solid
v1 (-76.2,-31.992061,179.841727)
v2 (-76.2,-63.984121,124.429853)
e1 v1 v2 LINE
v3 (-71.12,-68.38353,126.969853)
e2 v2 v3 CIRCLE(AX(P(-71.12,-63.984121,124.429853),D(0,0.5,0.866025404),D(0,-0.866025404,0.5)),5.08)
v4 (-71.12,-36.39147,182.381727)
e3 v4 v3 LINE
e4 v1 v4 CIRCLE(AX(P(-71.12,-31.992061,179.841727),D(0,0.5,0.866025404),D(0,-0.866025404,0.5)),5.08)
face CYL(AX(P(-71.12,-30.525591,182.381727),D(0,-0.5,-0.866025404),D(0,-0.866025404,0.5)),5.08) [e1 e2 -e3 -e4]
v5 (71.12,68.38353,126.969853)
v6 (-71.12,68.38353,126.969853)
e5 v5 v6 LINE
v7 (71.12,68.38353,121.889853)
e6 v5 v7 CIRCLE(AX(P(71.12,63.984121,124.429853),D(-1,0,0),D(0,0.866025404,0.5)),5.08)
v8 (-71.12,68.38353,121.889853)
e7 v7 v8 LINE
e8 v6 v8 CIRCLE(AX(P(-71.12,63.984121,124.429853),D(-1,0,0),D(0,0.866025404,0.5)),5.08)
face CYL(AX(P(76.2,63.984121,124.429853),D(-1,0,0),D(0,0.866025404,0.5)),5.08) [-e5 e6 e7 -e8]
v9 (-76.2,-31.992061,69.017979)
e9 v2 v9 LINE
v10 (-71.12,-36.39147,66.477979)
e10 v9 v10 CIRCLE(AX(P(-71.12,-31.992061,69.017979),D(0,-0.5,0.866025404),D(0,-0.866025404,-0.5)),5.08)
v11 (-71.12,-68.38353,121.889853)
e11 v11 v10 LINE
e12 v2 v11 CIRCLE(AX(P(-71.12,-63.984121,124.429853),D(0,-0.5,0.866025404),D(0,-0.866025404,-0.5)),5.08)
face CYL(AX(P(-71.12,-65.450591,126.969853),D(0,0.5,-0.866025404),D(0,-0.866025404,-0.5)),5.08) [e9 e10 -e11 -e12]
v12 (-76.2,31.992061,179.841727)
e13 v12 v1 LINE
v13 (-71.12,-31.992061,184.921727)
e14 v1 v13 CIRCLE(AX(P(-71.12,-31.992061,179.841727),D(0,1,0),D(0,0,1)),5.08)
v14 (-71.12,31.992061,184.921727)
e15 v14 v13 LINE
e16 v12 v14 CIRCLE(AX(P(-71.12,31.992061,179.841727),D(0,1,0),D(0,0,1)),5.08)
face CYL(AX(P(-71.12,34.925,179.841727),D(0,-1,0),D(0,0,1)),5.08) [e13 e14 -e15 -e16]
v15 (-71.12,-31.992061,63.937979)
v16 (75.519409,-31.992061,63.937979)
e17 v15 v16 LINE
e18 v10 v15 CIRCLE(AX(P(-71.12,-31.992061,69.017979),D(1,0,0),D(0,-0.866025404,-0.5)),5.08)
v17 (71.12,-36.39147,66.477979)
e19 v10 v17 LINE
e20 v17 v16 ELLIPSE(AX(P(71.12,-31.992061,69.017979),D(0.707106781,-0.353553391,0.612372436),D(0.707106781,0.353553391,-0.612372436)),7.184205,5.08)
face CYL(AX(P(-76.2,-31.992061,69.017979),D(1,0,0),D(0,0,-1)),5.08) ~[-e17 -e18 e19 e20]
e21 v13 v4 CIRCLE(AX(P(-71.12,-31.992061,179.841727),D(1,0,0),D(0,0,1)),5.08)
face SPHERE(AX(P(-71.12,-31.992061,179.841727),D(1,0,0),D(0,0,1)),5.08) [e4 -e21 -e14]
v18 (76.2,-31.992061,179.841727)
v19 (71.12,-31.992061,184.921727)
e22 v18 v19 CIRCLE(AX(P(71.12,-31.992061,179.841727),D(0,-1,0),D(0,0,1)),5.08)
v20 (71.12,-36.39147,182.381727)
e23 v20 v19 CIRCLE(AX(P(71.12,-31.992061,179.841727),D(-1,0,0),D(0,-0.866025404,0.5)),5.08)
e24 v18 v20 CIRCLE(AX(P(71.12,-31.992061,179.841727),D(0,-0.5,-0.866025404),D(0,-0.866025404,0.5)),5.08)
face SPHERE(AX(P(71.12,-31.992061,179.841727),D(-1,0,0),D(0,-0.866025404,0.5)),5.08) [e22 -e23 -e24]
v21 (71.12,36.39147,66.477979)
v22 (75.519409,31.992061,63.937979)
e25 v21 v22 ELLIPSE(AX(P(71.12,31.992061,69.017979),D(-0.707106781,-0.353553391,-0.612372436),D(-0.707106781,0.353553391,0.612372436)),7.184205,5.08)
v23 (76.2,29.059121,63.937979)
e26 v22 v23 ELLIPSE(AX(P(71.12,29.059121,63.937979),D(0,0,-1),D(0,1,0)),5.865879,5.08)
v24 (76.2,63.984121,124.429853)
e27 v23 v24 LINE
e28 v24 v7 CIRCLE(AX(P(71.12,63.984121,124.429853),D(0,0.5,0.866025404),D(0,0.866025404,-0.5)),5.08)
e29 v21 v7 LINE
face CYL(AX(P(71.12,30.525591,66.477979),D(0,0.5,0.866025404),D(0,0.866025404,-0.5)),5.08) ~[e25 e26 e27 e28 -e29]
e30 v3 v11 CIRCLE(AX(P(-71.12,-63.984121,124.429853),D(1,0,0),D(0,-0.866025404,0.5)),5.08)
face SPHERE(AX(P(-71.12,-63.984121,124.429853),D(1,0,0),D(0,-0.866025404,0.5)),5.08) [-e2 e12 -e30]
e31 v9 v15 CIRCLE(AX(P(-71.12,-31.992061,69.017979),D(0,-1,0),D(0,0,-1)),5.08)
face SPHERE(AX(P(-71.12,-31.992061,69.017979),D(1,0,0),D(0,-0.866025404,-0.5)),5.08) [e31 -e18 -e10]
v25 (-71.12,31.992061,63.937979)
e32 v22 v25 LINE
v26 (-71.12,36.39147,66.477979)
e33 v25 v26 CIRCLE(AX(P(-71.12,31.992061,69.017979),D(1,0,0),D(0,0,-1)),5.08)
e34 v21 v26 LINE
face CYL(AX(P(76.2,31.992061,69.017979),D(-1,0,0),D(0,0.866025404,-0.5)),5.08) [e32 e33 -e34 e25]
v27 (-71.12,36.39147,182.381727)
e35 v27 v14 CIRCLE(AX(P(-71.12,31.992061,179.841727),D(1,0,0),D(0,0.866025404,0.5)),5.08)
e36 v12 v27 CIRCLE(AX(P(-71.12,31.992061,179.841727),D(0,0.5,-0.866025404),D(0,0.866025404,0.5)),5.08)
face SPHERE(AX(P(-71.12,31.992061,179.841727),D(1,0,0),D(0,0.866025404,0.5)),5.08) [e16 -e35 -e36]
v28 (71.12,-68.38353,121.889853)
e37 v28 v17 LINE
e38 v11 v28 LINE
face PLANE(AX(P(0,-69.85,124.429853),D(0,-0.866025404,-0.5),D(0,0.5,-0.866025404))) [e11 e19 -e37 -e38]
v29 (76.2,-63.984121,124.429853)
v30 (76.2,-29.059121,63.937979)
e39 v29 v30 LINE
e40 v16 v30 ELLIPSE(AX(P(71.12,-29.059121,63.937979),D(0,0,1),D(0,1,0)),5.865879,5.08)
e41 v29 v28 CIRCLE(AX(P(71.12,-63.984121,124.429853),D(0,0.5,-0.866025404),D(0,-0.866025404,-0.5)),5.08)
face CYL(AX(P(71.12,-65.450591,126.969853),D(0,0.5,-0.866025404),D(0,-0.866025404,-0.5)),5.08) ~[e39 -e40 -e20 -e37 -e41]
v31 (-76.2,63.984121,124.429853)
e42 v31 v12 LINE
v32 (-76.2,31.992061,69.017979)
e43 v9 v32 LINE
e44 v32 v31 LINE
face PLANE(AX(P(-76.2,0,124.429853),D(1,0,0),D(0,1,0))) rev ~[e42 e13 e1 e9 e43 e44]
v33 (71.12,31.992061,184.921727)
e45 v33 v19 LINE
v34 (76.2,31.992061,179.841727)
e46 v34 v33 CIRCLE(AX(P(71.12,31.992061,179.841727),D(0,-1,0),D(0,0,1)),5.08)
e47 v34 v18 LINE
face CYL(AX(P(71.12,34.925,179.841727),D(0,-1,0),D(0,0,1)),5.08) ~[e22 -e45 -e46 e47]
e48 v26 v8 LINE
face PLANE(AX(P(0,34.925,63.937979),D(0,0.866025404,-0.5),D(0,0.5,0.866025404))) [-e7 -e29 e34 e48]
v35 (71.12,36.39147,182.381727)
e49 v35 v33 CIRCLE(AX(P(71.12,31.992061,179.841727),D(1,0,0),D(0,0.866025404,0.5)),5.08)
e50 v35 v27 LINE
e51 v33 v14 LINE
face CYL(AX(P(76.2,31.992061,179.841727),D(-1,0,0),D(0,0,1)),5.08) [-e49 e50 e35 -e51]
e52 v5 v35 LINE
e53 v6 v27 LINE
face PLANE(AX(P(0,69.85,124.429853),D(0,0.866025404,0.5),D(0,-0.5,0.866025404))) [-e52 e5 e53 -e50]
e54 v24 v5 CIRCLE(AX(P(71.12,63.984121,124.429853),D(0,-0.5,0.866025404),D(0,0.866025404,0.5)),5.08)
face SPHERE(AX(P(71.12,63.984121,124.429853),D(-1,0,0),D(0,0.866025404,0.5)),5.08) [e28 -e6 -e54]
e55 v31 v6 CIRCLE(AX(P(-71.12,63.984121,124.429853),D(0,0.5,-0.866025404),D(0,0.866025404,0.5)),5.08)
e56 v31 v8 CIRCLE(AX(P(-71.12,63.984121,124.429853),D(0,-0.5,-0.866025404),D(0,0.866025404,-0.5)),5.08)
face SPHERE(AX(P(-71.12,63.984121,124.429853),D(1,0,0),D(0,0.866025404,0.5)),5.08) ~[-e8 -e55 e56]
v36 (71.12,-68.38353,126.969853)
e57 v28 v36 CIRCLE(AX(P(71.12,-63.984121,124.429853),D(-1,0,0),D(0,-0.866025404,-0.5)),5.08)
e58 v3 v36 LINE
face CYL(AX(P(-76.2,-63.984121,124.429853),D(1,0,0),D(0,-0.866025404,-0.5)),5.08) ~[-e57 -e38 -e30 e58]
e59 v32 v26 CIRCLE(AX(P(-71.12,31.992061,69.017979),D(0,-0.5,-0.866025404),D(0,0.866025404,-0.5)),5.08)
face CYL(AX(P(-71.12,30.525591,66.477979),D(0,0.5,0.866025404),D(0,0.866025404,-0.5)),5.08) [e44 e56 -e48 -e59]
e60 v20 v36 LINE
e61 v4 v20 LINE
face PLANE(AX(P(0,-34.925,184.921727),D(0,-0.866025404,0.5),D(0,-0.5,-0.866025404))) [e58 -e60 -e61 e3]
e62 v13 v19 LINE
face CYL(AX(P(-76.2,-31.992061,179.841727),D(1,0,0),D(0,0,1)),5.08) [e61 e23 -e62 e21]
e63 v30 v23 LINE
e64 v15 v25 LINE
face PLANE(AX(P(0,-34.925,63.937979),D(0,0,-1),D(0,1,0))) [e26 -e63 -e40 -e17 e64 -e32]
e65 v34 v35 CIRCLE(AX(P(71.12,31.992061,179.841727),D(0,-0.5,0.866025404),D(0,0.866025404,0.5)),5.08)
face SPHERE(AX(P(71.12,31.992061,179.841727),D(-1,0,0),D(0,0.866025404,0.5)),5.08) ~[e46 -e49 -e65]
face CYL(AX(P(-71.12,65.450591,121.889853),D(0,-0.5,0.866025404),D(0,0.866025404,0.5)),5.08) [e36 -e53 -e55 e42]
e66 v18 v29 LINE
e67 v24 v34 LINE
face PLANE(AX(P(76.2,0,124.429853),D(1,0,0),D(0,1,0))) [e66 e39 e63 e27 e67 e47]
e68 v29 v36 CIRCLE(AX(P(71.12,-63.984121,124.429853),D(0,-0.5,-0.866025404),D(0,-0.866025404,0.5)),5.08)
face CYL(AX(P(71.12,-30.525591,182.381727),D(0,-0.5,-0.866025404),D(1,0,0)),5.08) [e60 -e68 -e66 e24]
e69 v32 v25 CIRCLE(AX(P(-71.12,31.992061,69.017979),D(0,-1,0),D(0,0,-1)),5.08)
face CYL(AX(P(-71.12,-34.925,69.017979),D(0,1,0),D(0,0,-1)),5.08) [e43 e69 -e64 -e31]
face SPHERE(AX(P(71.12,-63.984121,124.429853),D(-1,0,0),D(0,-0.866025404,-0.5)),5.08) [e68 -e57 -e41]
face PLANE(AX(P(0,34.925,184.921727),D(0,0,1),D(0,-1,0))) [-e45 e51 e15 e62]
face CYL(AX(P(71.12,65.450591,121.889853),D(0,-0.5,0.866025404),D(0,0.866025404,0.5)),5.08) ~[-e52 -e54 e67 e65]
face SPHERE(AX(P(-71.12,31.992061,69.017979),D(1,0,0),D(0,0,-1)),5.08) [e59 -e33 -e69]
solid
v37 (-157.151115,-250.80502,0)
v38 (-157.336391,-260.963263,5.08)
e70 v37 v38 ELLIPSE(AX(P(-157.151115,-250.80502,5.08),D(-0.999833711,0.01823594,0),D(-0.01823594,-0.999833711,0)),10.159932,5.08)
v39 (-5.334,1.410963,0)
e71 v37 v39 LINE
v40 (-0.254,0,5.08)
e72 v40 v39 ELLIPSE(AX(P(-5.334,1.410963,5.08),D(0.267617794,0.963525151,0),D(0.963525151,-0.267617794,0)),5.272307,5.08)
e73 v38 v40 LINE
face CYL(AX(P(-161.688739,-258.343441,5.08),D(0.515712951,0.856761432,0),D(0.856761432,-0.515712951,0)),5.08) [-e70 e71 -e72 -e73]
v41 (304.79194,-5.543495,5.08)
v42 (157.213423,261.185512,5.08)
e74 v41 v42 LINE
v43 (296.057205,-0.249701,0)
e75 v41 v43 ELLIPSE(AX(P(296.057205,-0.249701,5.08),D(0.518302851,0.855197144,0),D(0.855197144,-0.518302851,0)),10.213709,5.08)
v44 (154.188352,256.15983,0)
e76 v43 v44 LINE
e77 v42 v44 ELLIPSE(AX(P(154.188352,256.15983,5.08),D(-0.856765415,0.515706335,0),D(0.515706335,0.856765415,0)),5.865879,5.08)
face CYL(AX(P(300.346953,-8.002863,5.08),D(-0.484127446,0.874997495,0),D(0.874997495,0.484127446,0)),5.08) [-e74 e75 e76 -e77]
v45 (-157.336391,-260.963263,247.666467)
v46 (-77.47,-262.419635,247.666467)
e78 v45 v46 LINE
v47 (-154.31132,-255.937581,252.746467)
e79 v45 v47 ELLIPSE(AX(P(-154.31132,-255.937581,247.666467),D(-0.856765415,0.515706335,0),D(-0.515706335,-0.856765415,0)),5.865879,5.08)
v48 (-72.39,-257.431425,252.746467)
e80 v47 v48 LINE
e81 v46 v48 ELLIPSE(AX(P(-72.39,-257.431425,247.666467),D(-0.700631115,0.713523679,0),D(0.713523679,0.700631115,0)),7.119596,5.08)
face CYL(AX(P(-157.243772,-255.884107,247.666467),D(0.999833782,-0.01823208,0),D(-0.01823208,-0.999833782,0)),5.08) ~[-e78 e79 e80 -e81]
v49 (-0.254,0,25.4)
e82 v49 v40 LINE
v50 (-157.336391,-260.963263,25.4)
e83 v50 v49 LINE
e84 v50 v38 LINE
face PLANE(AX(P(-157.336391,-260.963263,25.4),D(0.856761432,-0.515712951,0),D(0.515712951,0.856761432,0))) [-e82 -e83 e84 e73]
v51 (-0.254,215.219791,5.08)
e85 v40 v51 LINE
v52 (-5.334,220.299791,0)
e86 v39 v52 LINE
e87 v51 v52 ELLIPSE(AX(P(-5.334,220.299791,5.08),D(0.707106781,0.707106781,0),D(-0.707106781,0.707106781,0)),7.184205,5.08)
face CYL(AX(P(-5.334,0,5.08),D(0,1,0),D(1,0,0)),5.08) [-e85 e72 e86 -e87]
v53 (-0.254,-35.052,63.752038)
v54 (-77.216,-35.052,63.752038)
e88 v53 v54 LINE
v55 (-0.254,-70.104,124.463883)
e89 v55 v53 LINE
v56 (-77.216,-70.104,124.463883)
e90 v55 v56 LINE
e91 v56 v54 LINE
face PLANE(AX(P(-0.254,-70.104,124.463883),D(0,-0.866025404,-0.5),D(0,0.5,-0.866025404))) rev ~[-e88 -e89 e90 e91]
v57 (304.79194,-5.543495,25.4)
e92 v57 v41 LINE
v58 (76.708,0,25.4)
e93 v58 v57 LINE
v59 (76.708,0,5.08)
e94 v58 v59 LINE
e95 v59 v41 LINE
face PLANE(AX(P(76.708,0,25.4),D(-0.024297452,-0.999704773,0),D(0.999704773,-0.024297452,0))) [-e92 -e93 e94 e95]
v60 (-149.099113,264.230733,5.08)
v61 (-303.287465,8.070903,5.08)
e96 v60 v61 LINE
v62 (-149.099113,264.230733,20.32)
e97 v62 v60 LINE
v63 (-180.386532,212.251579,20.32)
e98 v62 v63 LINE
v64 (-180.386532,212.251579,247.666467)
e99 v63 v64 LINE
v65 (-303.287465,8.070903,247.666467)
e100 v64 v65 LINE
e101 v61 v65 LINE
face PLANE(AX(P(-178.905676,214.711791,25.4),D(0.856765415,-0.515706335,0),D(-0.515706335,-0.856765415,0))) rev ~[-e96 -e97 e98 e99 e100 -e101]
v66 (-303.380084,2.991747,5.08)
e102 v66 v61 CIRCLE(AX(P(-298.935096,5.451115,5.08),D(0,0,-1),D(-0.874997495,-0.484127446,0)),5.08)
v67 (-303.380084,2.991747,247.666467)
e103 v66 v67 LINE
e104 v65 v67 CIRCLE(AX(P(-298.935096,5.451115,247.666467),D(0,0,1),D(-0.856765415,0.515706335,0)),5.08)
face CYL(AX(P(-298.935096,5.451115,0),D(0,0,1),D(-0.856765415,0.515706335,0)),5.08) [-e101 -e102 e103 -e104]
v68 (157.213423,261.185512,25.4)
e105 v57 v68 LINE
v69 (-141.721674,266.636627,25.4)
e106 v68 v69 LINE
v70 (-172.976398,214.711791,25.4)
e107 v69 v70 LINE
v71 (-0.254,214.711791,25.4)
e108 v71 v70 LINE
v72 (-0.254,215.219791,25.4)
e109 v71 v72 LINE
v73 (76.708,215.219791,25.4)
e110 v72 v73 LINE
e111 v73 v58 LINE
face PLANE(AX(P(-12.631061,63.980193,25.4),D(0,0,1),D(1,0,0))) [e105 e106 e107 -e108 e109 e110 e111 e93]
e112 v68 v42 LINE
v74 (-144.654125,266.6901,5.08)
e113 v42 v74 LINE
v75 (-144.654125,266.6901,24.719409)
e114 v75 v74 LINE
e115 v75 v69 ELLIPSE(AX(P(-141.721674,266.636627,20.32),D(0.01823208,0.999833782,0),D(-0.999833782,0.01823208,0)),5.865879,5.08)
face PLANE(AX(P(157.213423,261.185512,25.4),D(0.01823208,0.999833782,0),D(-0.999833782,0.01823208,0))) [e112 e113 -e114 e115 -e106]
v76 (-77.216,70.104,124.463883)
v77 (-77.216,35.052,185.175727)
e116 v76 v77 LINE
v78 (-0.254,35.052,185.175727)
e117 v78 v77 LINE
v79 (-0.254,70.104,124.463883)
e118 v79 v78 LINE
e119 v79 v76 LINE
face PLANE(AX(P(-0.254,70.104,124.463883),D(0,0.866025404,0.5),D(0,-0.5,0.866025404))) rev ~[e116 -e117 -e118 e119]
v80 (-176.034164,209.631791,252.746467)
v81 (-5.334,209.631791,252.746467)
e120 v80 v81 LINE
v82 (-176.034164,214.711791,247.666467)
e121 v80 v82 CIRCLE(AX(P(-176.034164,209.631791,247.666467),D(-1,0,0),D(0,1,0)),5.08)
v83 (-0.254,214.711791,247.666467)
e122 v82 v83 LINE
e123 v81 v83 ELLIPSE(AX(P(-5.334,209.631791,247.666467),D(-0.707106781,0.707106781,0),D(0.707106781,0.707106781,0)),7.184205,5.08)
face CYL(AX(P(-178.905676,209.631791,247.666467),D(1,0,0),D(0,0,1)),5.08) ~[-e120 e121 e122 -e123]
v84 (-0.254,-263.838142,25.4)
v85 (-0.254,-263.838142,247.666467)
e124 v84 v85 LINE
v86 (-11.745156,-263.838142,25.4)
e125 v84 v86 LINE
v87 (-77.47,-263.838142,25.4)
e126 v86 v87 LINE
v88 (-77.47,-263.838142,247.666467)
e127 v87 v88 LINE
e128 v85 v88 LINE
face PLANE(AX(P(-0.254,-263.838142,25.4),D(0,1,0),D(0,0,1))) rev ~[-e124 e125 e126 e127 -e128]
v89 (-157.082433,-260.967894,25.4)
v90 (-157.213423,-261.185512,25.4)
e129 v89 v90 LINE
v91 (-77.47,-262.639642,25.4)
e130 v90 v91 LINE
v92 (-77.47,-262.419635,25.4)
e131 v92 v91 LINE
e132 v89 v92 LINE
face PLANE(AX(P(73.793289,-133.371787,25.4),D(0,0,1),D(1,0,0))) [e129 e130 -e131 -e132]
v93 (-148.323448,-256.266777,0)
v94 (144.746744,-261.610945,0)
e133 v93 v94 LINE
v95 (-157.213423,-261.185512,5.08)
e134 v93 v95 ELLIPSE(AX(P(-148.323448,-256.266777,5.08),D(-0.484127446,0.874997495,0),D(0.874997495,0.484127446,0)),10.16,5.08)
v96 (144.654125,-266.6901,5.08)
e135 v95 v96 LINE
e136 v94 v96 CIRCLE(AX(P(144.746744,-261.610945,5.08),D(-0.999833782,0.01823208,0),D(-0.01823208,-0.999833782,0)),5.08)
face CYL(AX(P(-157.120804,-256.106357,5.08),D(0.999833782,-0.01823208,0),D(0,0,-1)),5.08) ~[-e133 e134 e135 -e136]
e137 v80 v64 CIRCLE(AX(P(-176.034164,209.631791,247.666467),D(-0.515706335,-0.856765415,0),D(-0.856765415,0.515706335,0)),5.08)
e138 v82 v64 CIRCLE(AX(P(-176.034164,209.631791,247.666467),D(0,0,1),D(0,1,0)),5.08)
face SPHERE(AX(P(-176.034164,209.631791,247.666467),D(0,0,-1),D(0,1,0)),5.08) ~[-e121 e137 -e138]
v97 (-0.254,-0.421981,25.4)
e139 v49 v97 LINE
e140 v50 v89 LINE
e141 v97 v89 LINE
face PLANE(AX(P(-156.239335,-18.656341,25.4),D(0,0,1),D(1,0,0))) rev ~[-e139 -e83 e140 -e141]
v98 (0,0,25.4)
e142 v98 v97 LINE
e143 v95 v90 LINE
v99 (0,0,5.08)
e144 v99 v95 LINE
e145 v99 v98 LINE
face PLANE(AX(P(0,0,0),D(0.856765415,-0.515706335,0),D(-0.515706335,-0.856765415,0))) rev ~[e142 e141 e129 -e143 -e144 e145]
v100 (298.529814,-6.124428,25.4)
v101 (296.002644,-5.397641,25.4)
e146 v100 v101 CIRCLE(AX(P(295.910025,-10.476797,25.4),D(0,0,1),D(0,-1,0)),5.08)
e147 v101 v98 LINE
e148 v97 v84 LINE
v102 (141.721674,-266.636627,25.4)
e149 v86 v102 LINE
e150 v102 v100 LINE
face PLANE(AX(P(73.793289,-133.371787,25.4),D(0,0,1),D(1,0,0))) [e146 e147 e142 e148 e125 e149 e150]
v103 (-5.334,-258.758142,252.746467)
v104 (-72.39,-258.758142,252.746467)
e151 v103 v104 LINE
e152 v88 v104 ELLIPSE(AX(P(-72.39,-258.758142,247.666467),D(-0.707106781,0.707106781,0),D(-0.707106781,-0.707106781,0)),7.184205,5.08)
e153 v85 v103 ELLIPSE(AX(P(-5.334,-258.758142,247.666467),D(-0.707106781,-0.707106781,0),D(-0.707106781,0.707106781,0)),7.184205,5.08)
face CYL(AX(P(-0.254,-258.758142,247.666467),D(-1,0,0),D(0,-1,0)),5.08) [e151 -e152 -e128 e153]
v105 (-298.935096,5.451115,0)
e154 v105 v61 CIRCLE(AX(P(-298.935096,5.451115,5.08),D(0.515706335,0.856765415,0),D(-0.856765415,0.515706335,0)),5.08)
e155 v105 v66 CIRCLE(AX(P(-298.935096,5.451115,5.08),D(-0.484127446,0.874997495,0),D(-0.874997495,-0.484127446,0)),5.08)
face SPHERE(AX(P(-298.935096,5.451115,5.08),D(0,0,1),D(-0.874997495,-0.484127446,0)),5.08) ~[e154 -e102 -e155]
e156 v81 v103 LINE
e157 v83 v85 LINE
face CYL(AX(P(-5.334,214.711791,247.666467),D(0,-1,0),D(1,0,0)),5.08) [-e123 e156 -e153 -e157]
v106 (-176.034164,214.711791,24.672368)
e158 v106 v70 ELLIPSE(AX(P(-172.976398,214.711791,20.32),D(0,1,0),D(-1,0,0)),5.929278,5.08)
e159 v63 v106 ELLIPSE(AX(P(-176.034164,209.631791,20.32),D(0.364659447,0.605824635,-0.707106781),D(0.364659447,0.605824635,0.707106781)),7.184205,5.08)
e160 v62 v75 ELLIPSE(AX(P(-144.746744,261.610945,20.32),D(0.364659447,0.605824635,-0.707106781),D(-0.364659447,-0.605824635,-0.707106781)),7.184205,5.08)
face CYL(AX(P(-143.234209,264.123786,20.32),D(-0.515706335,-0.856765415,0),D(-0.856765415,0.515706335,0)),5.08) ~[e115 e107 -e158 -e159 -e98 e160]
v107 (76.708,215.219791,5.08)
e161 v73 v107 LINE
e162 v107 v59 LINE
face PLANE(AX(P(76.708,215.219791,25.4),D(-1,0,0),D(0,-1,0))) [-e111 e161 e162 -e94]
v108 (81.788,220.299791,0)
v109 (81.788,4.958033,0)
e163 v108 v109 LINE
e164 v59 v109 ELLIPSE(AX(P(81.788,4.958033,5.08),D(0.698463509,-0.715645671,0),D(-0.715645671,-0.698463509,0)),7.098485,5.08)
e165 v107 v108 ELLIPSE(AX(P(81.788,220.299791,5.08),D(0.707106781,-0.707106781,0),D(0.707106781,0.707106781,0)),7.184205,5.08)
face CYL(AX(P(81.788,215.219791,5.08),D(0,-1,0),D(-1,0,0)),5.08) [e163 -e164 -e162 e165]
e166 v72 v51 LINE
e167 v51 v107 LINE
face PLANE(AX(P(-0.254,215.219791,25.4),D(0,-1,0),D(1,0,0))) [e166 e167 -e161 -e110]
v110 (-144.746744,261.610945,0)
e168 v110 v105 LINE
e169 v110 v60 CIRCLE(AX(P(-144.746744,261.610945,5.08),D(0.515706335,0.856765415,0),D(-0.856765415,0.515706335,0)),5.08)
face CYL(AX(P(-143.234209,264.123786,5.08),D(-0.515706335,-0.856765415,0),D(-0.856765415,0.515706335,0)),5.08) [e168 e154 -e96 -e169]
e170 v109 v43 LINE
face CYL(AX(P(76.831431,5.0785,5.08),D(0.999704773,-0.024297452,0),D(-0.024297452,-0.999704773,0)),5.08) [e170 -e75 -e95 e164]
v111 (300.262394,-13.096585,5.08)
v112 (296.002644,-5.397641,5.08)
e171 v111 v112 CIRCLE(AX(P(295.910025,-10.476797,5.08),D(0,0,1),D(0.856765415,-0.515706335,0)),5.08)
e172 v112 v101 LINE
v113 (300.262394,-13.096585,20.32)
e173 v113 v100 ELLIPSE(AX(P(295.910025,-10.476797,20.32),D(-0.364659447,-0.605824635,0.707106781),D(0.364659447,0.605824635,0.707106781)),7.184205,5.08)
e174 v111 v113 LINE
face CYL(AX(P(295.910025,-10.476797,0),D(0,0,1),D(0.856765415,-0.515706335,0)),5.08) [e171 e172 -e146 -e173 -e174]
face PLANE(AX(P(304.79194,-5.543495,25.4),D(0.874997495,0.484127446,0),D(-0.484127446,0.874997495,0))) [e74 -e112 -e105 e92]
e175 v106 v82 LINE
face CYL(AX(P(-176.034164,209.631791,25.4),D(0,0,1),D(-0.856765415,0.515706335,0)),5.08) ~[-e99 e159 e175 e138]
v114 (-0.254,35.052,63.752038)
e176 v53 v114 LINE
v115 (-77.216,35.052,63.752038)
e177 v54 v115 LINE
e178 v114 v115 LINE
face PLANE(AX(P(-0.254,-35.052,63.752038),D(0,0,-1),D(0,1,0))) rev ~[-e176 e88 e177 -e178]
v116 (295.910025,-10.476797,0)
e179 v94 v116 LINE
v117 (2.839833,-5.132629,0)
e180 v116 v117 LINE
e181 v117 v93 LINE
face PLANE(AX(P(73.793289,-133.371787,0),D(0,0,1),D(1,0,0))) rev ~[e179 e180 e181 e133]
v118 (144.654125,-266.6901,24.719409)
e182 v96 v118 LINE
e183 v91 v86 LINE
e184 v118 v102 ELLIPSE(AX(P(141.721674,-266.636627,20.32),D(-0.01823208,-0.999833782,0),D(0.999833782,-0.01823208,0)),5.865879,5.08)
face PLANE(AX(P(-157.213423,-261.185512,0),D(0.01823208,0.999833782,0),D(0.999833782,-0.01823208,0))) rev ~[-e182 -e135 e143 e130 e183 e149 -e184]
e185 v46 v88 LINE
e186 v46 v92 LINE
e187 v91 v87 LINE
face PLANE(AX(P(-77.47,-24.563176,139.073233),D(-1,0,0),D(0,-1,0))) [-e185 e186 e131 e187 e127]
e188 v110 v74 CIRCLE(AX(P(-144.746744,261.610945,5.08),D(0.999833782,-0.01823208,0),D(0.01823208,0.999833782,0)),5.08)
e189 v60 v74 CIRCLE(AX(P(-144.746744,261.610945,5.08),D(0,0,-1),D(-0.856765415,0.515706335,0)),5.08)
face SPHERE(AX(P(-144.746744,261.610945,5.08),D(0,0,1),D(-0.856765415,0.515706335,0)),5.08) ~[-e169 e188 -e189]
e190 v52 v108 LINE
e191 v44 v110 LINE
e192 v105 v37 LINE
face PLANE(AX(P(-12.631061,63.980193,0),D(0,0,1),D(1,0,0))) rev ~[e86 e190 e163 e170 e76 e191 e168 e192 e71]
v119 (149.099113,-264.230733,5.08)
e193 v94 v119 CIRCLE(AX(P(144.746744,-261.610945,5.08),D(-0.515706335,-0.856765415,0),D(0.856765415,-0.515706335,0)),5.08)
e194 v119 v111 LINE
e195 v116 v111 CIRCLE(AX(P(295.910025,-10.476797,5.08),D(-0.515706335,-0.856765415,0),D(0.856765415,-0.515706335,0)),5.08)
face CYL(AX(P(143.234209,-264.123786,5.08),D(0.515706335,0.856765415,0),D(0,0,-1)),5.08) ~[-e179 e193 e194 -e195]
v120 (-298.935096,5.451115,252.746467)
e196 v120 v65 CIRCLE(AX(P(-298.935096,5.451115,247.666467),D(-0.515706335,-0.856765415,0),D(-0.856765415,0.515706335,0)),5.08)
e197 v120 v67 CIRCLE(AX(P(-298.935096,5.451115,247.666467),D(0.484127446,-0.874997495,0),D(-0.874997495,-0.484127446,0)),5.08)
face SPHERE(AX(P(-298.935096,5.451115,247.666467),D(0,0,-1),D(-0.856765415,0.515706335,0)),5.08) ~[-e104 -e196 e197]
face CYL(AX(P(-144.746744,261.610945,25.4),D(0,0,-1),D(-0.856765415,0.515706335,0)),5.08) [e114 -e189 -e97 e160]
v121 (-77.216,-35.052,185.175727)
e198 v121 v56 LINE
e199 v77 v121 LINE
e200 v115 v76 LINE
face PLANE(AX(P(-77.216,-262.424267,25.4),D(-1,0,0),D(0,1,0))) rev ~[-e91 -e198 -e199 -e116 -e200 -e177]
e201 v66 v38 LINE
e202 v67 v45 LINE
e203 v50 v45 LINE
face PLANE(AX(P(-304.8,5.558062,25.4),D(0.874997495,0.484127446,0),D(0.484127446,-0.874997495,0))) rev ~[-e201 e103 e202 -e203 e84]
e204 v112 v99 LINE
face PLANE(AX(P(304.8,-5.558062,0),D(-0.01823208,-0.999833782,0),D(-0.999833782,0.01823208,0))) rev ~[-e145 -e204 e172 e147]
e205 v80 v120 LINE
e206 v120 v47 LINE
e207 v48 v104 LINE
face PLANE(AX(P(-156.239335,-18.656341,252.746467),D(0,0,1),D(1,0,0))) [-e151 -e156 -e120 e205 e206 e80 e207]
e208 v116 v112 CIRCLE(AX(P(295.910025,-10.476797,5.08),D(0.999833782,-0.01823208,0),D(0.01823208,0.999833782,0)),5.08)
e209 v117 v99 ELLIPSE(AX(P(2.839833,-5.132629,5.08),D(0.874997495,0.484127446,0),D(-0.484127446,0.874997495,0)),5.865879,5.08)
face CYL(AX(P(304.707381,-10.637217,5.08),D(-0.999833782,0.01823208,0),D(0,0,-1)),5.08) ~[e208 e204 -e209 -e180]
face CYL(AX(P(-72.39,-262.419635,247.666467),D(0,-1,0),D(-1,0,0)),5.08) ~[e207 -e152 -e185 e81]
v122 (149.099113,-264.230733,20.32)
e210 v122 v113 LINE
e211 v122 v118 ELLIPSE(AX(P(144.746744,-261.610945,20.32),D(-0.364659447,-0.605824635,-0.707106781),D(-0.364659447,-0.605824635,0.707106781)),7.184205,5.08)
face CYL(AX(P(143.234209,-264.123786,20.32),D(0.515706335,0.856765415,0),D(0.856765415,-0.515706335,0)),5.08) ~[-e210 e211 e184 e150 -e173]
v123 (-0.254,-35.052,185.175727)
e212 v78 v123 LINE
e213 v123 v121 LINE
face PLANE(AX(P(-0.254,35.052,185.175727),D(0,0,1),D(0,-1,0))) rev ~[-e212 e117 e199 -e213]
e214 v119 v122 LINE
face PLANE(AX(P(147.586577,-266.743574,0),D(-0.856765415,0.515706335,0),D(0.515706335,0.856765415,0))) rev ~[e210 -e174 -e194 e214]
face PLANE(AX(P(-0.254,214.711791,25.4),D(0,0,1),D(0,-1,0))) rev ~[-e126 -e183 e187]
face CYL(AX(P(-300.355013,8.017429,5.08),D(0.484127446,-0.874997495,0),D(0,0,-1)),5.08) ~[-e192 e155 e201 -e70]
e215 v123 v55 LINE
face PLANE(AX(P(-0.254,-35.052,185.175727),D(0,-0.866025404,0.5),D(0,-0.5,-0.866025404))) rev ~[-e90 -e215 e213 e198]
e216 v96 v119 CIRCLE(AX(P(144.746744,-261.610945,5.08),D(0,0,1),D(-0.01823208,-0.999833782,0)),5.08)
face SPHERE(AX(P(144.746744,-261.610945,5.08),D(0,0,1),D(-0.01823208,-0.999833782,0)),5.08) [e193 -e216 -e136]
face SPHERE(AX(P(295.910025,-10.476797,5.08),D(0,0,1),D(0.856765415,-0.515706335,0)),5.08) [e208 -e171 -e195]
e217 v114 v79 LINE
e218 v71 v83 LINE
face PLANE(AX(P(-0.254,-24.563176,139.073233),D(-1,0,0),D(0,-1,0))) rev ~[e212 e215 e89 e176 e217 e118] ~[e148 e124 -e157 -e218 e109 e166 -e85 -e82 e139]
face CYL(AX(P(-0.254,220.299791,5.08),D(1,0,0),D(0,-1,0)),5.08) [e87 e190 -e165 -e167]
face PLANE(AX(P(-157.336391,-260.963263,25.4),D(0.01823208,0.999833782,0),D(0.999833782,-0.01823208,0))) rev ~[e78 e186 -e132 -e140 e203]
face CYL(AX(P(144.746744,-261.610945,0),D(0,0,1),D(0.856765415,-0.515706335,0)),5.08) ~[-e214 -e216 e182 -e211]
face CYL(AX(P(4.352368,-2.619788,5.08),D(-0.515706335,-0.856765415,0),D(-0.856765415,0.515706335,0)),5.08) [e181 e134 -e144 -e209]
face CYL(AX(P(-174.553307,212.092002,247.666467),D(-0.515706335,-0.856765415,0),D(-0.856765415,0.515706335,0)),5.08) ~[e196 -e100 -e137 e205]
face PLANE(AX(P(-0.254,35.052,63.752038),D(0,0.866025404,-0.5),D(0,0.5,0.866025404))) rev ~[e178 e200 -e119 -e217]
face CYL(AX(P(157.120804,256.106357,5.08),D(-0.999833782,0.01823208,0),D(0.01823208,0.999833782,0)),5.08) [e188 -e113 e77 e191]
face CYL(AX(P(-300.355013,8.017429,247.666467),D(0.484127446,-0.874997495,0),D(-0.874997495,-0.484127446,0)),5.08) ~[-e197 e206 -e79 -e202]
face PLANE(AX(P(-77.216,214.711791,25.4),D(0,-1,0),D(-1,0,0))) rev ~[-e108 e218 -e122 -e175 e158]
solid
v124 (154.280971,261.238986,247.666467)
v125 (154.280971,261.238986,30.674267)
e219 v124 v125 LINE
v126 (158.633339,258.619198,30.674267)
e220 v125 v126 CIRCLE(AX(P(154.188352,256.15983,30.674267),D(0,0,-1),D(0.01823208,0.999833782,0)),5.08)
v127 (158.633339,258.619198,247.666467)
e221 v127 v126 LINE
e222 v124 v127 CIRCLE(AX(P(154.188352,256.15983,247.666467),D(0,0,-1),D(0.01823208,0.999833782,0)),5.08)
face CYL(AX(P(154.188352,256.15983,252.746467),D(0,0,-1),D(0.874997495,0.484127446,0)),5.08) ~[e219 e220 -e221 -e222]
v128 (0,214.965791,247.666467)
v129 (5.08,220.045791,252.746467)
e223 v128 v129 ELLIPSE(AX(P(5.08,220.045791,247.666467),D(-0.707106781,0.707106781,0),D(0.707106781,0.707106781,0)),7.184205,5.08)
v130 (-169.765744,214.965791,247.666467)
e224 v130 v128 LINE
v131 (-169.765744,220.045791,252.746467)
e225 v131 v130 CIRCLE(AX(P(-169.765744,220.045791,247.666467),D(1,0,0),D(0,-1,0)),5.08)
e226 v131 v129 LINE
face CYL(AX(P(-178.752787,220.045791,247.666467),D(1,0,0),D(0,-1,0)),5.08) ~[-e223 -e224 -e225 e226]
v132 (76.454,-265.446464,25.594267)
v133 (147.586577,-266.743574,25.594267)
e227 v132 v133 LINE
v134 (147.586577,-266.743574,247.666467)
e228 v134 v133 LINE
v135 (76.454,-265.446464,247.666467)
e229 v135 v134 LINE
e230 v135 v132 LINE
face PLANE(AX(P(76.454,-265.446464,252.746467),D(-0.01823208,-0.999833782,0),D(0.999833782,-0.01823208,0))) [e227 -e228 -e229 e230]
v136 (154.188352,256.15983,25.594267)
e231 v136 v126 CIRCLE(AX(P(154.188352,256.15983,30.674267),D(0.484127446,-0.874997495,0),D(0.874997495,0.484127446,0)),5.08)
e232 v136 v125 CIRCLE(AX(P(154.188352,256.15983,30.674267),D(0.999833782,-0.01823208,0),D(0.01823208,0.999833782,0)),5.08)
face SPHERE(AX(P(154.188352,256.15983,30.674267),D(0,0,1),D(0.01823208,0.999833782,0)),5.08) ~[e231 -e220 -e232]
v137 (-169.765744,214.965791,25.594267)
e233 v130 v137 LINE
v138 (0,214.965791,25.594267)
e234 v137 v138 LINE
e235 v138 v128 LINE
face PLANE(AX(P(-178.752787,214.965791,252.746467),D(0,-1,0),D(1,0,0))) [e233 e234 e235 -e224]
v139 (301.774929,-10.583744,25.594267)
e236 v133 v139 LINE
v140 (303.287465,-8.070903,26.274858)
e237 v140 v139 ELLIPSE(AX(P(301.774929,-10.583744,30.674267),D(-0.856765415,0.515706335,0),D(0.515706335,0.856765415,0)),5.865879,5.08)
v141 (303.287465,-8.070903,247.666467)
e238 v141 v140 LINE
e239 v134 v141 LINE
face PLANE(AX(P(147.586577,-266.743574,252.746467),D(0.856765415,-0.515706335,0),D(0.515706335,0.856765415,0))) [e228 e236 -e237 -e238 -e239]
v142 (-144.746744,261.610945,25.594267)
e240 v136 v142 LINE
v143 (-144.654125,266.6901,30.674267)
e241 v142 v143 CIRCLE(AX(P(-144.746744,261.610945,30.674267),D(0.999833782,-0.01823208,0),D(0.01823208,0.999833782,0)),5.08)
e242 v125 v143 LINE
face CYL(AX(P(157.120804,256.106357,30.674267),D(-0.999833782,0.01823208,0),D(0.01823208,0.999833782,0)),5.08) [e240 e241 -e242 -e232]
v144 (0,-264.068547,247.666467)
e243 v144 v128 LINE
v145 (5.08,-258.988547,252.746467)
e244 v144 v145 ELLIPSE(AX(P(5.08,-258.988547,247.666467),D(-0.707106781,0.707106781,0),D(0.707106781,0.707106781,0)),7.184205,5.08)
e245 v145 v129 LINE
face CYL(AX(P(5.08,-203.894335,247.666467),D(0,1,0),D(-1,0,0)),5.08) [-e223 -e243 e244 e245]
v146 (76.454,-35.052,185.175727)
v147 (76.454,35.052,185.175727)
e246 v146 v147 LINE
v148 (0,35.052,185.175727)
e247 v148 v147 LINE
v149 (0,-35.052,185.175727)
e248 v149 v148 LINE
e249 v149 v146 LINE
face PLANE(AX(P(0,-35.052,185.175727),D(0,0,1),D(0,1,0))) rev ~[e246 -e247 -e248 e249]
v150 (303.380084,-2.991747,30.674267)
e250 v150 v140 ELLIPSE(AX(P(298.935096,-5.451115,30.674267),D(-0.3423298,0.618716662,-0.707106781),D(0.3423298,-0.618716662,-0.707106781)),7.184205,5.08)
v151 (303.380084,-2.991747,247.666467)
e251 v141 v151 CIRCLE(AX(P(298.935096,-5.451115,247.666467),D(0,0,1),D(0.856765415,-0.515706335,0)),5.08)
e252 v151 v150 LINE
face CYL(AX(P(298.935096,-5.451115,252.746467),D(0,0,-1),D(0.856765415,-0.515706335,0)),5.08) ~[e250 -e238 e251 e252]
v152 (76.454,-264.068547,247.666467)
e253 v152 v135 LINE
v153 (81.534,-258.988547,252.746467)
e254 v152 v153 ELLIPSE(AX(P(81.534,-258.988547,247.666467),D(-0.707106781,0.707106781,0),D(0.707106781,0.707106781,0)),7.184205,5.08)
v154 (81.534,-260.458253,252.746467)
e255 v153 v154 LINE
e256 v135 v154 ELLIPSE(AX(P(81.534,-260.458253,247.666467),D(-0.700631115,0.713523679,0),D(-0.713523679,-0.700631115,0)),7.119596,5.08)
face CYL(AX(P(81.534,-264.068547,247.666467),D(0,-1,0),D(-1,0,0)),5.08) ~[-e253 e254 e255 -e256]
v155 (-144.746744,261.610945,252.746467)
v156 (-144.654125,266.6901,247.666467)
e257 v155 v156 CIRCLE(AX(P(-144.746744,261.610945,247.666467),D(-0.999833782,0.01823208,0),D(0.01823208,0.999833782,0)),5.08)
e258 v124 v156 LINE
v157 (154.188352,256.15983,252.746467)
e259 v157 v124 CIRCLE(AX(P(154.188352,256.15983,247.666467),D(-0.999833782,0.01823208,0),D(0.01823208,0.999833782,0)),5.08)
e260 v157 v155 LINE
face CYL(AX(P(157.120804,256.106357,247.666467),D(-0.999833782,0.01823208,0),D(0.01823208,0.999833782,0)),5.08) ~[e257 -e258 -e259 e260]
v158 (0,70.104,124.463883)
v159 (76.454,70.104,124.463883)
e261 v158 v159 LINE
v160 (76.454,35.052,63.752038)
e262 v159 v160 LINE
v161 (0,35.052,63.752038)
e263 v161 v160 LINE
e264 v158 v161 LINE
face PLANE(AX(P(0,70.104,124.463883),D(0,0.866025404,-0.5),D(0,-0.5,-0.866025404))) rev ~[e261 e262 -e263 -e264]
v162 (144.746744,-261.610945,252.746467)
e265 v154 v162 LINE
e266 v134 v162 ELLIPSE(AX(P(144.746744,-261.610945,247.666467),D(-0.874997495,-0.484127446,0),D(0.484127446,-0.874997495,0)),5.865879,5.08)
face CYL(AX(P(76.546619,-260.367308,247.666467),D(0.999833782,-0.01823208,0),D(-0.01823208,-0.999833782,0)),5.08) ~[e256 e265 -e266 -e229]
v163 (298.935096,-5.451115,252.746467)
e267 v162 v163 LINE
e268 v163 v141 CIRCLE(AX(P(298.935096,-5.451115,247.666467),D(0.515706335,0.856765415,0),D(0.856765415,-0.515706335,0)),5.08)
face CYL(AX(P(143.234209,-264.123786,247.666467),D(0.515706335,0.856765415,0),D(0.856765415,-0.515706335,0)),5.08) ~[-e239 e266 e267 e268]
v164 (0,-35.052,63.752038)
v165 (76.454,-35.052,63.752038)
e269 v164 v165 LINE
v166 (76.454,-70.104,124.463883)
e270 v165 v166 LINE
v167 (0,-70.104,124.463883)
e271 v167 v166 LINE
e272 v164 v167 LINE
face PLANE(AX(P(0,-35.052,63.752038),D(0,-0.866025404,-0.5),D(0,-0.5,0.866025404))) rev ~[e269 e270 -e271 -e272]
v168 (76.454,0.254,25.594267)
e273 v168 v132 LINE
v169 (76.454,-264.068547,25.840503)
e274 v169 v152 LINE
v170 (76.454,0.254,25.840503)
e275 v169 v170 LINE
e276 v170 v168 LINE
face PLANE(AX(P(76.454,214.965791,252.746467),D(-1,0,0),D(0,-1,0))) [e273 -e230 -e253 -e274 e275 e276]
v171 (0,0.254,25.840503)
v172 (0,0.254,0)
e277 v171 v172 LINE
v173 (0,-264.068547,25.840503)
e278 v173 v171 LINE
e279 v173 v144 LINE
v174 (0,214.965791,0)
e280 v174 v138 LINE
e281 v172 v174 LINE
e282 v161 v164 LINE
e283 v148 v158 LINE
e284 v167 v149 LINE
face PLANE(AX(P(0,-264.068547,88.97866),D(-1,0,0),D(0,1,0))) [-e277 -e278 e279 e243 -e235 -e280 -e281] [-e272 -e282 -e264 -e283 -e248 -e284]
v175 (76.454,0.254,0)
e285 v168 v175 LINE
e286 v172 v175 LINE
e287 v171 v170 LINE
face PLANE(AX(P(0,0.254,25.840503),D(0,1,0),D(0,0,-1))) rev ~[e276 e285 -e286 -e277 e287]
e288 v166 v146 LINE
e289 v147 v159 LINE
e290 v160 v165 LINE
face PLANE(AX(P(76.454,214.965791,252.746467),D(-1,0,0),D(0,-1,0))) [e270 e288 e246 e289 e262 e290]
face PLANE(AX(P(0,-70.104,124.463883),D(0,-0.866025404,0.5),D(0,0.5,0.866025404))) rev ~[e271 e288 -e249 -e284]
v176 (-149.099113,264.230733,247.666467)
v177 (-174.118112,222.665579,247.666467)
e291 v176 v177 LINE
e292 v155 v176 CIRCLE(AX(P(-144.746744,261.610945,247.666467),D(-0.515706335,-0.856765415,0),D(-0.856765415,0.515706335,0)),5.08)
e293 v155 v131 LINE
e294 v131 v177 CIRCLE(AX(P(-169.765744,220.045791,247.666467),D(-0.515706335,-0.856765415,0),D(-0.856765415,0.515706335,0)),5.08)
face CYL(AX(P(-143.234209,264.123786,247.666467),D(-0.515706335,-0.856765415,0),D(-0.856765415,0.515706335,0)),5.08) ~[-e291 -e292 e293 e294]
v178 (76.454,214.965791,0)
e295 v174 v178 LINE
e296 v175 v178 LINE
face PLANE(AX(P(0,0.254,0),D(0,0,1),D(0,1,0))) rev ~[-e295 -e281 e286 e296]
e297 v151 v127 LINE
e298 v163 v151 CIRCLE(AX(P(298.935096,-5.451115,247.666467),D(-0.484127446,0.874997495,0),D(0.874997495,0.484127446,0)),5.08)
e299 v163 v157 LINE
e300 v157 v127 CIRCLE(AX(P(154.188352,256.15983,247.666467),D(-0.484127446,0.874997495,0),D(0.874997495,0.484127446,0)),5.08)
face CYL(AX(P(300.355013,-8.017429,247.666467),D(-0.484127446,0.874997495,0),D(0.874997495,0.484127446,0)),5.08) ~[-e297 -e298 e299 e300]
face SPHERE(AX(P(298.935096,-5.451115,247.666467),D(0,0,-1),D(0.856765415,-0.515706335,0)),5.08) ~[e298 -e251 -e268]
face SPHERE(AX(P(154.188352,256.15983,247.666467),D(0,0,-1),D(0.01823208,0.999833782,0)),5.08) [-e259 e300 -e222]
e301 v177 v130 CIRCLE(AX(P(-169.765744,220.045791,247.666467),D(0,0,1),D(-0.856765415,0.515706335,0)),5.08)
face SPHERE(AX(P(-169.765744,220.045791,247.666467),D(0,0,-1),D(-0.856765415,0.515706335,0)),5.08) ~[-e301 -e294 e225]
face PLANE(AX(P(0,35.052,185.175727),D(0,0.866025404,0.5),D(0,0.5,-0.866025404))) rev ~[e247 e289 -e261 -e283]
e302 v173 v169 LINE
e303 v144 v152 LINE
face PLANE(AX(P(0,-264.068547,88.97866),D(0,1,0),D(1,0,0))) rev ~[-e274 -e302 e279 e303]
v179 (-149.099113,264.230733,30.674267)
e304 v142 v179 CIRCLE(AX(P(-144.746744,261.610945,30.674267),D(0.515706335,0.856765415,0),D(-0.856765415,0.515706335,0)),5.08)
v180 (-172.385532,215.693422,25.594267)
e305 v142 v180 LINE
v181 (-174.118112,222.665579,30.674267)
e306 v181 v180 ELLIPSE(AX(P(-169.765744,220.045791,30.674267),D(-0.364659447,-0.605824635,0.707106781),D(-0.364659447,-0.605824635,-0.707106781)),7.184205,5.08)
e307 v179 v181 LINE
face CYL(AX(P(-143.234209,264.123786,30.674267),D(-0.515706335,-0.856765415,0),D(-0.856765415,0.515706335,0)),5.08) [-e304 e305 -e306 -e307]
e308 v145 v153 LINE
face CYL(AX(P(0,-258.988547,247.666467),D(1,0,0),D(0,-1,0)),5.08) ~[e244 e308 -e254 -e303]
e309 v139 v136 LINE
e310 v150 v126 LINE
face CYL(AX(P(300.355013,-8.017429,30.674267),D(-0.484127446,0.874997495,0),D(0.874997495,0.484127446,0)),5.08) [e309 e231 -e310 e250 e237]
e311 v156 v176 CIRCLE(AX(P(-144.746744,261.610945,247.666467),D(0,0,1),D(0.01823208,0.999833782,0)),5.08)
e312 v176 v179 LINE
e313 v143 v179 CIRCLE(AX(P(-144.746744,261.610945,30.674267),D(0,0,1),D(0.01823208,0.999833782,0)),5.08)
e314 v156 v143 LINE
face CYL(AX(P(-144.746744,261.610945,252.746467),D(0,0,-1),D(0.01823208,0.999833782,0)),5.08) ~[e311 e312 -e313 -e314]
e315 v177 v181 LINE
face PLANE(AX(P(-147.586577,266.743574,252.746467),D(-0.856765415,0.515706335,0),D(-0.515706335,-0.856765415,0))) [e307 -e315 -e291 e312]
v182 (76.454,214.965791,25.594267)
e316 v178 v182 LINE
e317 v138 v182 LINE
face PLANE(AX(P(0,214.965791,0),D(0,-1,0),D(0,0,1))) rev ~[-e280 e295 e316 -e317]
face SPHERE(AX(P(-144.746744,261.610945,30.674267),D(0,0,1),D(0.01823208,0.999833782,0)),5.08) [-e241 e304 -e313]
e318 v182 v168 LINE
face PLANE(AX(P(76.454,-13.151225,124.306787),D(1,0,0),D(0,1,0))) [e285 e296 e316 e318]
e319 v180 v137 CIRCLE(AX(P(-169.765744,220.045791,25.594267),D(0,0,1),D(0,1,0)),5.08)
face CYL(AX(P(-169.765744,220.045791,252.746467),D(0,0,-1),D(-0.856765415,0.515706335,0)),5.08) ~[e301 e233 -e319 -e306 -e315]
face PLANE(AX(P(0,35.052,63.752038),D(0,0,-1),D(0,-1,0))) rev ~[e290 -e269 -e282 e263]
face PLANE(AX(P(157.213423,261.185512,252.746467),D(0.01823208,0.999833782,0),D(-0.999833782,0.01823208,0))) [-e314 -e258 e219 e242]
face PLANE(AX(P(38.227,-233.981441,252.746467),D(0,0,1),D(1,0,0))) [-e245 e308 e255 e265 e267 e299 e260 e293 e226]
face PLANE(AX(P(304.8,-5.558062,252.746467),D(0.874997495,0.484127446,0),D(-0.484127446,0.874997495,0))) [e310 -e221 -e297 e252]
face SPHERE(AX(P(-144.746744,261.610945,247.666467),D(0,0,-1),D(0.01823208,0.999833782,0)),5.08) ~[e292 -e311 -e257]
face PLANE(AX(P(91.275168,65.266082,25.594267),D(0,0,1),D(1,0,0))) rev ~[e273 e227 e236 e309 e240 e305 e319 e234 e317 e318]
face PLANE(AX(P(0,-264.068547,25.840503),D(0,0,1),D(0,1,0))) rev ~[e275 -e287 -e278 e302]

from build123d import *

# Parameters (mm, degrees)
F2_DEPTH      = 25.4
F4_DEPTH      = 76.2
F4_DEPTH_BACK = 76.2
F6_DEPTH      = 76.454
F8_DEPTH      = 227.1522
F10_DEPTH     = 25.4
F12_W         = 478.5499326668
F12_H         = 227.3464668878
F13_DEPTH     = 77.216
F15_DEPTH     = 227.3464668878
F16_W         = 76.454
F16_H         = 60.1742118597
F17_DEPTH     = 163.7678072
F18_R         = 5.08
F18_2_R       = 5.08
F20_R         = 5.08


# Not quite as in the source:
# - an extrude ends at something that could not be found from the text; its depth is read off the source's solid


with BuildPart() as f2:
    # F1 (on face) → F2 (new body)
    with BuildSketch(Plane.XY):
        Polygon((304.8, -5.5580618585), (0, 0), (-157.2134227653, -261.1855121443), (147.5865772347, -266.7435740027), align=None)
    extrude(amount=F2_DEPTH)



with BuildPart() as f4:
    # F3 (on Right) → F4 (new body, two sides)
    with BuildSketch(Plane.YZ) as f4_sk:
        Polygon((34.925, 184.9217274444), (-34.925, 184.9217274444), (-69.85, 124.4298529901), (-34.925, 63.9379785357), (34.925, 63.9379785357), (69.85, 124.4298529901), align=None)
    extrude(amount=F4_DEPTH)
    extrude(f4_sk.sketch, amount=-F4_DEPTH_BACK)

    # F20
    f20_edges = [f4.edges().sort_by_distance(p)[0] for p in [
        (76.2, 0, 184.921727),
        (0, -34.925, 184.921727),
        (-76.2, 0, 184.921727),
        (0, 34.925, 184.921727),
        (-76.2, 52.3875, 154.67579),
        (-76.2, -52.3875, 154.67579),
        (-76.2, -52.3875, 94.183916),
        (-76.2, 0, 63.937979),
        (-76.2, 52.3875, 94.183916),
        (76.2, -52.3875, 154.67579),
        (0, -69.85, 124.429853),
        (0, 69.85, 124.429853),
        (76.2, 52.3875, 154.67579),
        (76.2, -52.3875, 94.183916),
        (0, -34.925, 63.937979),
        (0, 34.925, 63.937979),
        (76.2, 52.3875, 94.183916),
    ]]
    fillet(f20_edges, radius=F20_R)


with BuildPart() as f6:
    # F5 (on Right) → F6 (new body)
    with BuildSketch(Plane.YZ):
        Polygon((-264.0685473475, 88.9786597022), (-264.0685473475, 25.8405029335), (0.254, 25.8405029335), (0.254, 0), (214.9657905102, 0), (214.9657905102, 252.7464668878), (-203.8943354878, 252.7464668878), (-203.8943354878, 88.9786597022), align=None)
        Polygon((-35.052, 185.1757274444), (35.052, 185.1757274444), (70.104, 124.4638825375), (35.052, 63.7520376306), (-35.052, 63.7520376306), (-70.104, 124.4638825375), align=None, mode=Mode.SUBTRACT)
    extrude(amount=F6_DEPTH)

    # F7 (on face) → F8 (join)
    with BuildSketch(Plane.XY.offset(252.7464668878)):
        Polygon((-178.7527874094, 214.9657905102), (0, 214.9657905102), (76.454, 214.9657905102), (76.454, -203.8943354878), (76.454, -265.4464635552), (147.5865772347, -266.7435740027), (304.8, -5.5580618585), (157.2134227653, 261.1855121443), (-147.5865772347, 266.7435740027), align=None)
    extrude(amount=-F8_DEPTH)

    # F16 (on face) → F17 (join, through all)
    with BuildSketch(Plane.XY.offset(88.9786597022)):
        with Locations((38.227, -233.9814414177)):
            Rectangle(F16_W, F16_H)
    extrude(amount=F17_DEPTH)

    # F18#2
    f18_2_edges = [f6.edges().sort_by_distance(p)[0] for p in [
        (157.213423, 261.185512, 139.170367),
        (-147.586577, 266.743574, 139.170367),
        (4.813423, 263.964543, 252.746467),
        (4.813423, 263.964543, 25.594267),
        (-178.752787, 214.965791, 139.170367),
        (-163.169682, 240.854682, 252.746467),
        (-163.169682, 240.854682, 25.594267),
        (0, -233.981441, 252.746467),
        (38.227, -264.068547, 252.746467),
        (76.454, -264.757505, 252.746467),
        (112.020289, -266.095019, 252.746467),
        (226.193289, -136.150818, 252.746467),
        (231.006711, 127.813725, 252.746467),
        (-89.376394, 214.965791, 252.746467),
        (0, 5.535728, 252.746467),
        (304.8, -5.558062, 139.170367),
        (231.006711, 127.813725, 25.594267),
    ]]
    fillet(f18_2_edges, radius=F18_2_R)


with BuildPart() as f10:
    # F9 (on face) → F10 (new body, through all)
    with BuildSketch(Plane.XY.offset(25.4)):
        Polygon((-304.8, 5.5580618585), (-157.3363911366, -260.9632627806), (-0.254, 0), (-0.254, 215.2197905102), (76.708, 215.2197905102), (76.708, 0), (304.7919404066, -5.54349519), (157.2134227653, 261.1855121443), (-147.5865772347, 266.7435740027), align=None)
    extrude(amount=-F10_DEPTH)


with BuildPart() as f2_1:
    add(f2.part)

    add(f10.part)  # F13 merges F10
    # F12 (on offset) → F13 (join)
    with BuildSketch(Plane(origin=(-0.254, 0, 0), x_dir=(0, -1, 0), z_dir=(-1, 0, 0))):
        with Locations((24.5631758232, 139.0732334439)):
            Rectangle(F12_W, F12_H)
        Polygon((-70.104, 124.4638825375), (-35.052, 185.1757274444), (35.052, 185.1757274444), (70.104, 124.4638825375), (35.052, 63.7520376306), (-35.052, 63.7520376306), align=None, mode=Mode.SUBTRACT)
    extrude(amount=F13_DEPTH)

    # F14 (on face) → F15 (join, through all)
    with BuildSketch(Plane.XY.offset(25.4)):
        Polygon((-178.9056757111, 214.7117905102), (-304.8, 5.5580618585), (-157.3363911366, -260.9632627806), (-77.216, -262.4242670131), (-77.216, 214.7117905102), align=None)
    extrude(amount=F15_DEPTH)

    # F18
    f18_edges = [f2_1.edges().sort_by_distance(p)[0] for p in [
        (-89.579838, 214.711791, 252.746467),
        (-241.852838, 110.134926, 252.746467),
        (-231.068196, -127.7026, 252.746467),
        (-117.403196, -261.691449, 252.746467),
        (-77.47, -263.128889, 252.746467),
        (-38.862, -263.838142, 252.746467),
        (-0.254, -24.563176, 252.746467),
        (-147.586577, 266.743574, 12.7),
        (-226.193289, 136.150818, 0),
        (-304.8, 5.558062, 126.373233),
        (-178.905676, 214.711791, 139.073233),
        (-163.246126, 240.727682, 25.4),
        (-231.068196, -127.7026, 0),
        (-78.795196, -130.481631, 0),
        (-0.254, 107.609895, 0),
        (38.227, 215.219791, 0),
        (76.708, 107.609895, 0),
        (190.74997, -2.771748, 0),
        (231.002682, 127.821008, 0),
        (4.813423, 263.964543, 0),
        (-4.813423, -263.964543, 0),
        (226.193289, -136.150818, 0),
        (152.4, -2.779031, 0),
        (-78.606711, -130.592756, 0),
        (147.586577, -266.743574, 12.7),
        (304.8, -5.558062, 12.7),
        (226.193289, -136.150818, 25.4),
    ]]
    fillet(f18_edges, radius=F18_R)


solid = Compound([f4.part, f6.part, f2_1.part])
